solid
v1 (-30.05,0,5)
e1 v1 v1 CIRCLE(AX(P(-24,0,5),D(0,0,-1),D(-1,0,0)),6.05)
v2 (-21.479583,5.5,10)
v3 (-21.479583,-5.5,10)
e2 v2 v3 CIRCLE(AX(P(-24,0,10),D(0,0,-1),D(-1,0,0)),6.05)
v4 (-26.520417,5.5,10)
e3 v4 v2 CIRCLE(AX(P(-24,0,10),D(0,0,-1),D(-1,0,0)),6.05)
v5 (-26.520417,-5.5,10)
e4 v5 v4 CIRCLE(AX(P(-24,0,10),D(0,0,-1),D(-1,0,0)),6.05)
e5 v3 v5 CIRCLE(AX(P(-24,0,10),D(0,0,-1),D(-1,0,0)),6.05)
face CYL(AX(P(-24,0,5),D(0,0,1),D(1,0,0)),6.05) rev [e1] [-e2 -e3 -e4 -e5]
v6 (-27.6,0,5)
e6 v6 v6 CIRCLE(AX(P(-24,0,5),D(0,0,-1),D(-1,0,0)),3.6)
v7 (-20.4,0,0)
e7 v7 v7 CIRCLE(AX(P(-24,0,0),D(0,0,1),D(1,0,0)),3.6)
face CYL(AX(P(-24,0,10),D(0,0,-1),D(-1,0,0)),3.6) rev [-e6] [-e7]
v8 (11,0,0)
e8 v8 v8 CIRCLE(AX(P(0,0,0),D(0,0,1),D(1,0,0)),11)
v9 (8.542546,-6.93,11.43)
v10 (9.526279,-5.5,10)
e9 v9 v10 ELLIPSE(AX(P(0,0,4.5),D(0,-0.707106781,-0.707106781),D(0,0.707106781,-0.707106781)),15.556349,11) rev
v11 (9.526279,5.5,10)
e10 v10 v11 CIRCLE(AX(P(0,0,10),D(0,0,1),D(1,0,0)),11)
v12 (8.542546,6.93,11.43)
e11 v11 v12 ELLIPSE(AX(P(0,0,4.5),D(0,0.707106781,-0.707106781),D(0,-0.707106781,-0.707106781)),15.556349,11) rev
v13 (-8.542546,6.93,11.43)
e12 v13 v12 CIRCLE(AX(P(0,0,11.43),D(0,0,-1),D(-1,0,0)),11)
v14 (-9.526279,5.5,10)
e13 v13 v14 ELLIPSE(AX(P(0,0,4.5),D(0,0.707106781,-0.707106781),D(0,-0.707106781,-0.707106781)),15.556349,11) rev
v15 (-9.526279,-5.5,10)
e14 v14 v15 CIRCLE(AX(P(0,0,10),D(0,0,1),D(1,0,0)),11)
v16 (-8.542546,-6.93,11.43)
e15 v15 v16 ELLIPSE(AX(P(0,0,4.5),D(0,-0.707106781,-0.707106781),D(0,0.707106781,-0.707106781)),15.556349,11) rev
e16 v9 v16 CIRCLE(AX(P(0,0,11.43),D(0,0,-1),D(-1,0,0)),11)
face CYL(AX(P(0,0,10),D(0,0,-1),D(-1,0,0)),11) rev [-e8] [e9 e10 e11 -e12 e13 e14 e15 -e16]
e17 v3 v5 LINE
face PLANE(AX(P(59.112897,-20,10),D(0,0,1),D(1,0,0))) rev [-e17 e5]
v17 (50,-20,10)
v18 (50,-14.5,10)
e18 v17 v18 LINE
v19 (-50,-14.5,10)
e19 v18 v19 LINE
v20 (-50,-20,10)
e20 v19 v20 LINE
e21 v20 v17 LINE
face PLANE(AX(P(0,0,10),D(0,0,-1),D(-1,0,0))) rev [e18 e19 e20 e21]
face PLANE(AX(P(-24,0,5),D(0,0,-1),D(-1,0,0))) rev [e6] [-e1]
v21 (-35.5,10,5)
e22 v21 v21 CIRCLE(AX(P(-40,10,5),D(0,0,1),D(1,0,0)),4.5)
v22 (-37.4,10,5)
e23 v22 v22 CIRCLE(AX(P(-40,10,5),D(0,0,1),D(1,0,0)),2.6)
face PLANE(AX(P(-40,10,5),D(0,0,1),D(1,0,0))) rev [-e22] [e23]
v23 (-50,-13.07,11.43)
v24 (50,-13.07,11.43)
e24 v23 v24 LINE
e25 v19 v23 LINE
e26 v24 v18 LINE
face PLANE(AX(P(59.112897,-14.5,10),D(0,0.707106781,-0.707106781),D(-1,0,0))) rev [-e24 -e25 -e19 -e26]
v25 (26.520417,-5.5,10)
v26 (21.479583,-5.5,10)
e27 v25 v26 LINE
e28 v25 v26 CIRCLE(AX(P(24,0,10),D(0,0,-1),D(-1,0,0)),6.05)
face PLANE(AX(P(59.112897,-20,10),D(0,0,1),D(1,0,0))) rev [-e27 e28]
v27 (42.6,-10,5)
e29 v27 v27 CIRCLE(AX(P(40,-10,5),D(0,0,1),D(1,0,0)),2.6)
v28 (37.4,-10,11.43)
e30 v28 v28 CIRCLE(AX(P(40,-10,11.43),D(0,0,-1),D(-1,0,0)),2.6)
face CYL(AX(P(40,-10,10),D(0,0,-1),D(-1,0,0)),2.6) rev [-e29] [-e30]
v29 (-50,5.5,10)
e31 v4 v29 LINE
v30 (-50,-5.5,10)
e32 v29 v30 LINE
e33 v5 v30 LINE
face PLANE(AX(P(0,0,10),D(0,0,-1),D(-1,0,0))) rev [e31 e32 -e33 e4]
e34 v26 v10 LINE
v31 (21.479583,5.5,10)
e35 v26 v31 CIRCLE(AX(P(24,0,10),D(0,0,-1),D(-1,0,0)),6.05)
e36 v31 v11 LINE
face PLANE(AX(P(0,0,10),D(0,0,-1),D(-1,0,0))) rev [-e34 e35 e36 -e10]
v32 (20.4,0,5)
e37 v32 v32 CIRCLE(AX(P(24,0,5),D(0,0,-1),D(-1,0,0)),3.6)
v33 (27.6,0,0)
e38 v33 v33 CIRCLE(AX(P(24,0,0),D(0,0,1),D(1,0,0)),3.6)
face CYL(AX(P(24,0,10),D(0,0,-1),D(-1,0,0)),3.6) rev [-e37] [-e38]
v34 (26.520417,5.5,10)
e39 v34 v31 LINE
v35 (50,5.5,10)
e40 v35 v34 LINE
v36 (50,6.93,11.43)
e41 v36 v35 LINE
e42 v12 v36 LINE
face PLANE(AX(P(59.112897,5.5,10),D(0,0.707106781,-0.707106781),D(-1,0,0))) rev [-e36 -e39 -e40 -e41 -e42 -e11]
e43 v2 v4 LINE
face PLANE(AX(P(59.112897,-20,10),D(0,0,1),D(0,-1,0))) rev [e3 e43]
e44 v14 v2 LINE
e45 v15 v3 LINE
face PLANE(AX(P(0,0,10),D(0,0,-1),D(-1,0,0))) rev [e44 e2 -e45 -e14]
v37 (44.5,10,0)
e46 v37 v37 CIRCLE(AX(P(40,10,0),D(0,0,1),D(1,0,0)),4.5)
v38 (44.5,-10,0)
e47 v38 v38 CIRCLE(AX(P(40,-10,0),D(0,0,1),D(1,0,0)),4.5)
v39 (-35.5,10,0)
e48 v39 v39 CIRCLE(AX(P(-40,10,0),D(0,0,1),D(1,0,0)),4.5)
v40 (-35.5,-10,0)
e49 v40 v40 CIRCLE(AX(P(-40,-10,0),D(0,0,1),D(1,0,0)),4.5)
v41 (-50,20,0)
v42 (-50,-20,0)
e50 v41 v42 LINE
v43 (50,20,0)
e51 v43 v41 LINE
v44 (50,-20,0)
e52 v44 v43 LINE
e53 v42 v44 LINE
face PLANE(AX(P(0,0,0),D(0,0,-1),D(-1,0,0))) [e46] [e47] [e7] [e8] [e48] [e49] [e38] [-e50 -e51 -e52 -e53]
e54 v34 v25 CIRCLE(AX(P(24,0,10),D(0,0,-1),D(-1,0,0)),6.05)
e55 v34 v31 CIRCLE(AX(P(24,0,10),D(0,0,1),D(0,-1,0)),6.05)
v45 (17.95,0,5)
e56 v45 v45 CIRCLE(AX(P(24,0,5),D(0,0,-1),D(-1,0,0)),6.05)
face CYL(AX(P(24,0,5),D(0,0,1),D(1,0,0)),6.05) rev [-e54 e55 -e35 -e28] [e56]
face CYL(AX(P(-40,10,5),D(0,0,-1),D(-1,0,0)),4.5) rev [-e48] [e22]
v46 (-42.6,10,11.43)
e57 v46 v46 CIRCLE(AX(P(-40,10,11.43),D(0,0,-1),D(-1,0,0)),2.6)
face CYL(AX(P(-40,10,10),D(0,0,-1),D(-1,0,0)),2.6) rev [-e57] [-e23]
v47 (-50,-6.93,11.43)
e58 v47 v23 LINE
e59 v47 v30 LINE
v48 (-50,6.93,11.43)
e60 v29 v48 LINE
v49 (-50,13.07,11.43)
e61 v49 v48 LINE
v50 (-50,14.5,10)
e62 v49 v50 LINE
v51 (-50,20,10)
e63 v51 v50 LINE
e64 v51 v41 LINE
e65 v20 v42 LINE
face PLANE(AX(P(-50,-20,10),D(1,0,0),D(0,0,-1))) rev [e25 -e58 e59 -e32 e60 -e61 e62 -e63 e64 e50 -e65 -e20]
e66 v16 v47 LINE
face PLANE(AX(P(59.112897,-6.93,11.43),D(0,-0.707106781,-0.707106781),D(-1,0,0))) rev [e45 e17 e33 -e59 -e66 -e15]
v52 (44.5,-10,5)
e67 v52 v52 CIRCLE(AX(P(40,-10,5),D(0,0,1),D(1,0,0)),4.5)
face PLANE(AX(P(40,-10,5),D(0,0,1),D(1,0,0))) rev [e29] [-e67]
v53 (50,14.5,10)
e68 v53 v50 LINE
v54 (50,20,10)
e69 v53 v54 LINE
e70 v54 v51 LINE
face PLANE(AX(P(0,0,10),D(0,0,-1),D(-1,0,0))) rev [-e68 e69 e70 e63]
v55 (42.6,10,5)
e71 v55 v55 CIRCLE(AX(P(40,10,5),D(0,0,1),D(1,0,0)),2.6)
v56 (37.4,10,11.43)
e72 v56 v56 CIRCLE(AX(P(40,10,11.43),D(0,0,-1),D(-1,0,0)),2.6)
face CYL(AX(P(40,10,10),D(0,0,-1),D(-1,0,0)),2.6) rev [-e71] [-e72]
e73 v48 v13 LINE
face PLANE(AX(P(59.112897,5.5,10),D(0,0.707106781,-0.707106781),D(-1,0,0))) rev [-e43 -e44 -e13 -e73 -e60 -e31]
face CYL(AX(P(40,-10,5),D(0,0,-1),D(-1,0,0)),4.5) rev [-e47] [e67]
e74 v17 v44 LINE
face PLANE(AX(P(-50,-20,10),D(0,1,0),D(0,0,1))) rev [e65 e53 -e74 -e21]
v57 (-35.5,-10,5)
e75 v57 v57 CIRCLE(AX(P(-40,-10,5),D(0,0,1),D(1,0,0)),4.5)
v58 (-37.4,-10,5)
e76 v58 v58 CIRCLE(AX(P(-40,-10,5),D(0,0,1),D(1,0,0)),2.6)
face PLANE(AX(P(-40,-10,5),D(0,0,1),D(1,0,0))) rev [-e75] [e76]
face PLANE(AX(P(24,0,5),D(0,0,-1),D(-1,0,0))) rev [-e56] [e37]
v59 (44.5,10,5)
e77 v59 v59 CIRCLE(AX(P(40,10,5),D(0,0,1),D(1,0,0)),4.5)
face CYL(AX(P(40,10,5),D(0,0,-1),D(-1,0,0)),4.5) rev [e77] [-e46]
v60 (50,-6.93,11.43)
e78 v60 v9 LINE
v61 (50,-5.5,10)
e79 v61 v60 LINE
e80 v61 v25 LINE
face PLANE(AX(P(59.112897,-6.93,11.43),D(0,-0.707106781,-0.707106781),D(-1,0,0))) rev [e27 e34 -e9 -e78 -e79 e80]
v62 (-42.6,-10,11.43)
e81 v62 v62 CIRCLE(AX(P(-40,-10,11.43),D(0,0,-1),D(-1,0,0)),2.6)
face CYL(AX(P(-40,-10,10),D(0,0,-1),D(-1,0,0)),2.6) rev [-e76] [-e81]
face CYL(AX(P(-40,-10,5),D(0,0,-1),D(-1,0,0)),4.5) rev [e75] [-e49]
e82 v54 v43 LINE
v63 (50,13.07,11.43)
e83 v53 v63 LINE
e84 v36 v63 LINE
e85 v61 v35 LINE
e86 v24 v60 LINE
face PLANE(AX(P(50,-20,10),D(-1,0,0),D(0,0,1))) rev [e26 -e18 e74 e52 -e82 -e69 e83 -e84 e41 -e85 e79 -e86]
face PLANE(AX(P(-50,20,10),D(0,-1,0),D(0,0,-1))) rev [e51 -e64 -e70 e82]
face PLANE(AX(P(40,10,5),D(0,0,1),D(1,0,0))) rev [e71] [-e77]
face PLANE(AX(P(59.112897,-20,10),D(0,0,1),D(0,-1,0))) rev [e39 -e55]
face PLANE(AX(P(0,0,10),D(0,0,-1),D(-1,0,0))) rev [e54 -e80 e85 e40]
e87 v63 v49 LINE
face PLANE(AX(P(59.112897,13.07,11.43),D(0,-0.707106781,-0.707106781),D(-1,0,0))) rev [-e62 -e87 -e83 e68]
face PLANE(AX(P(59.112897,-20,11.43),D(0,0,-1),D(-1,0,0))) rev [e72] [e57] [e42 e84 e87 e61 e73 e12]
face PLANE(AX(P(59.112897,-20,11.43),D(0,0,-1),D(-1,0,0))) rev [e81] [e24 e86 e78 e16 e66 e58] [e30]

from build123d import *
from build123d.topology import SkipClean

# Parameters (mm, degrees)
SKETCH1_W               = 100
SKETCH1_H               = 40
SKETCH1_R               = 11
SKETCH1_R_2             = 2.6
SKETCH1_R_3             = 3.6
BOSS_EXTRUDE1_DEPTH     = 10
CUT_EXTRUDE1_START      = 10
SKETCH2_R               = 6.05
CUT_EXTRUDE1_DEPTH      = 5
SKETCH3_R               = 4.5
CUT_EXTRUDE2_DEPTH      = 5
BOSS_EXTRUDE3_START     = -50
SKETCH4_W               = 1.43
SKETCH4_H               = 9
BOSS_EXTRUDE3_DEPTH     = 100
CHAMFER1_SIZE           = 1.43
CUT_EXTRUDE4_DEPTH      = 56.051293354
CUT_EXTRUDE4_DEPTH_BACK = 56.051293354
SKETCH5_R               = 11
SKETCH5_R_2             = 2.6


with BuildPart() as part:
    # Sketch1 → Boss-Extrude1 (new body)
    with BuildSketch(Plane.XY):
        Rectangle(SKETCH1_W, SKETCH1_H)
        Circle(SKETCH1_R, mode=Mode.SUBTRACT)
        with Locations((-40, 10)):
            Circle(SKETCH1_R_2, mode=Mode.SUBTRACT)
        with Locations((-40, -10)):
            Circle(SKETCH1_R_2, mode=Mode.SUBTRACT)
        with Locations((40, 10)):
            Circle(SKETCH1_R_2, mode=Mode.SUBTRACT)
        with Locations((40, -10)):
            Circle(SKETCH1_R_2, mode=Mode.SUBTRACT)
        with Locations((-24, 0)):
            Circle(SKETCH1_R_3, mode=Mode.SUBTRACT)
        with Locations((24, 0)):
            Circle(SKETCH1_R_3, mode=Mode.SUBTRACT)
    extrude(amount=BOSS_EXTRUDE1_DEPTH)

    # Sketch2 → Cut-Extrude1 (cut)
    with BuildSketch(Plane.XY.offset(CUT_EXTRUDE1_START)):
        with Locations(Location((24, 0, 0), (0, 0, 180))):
            Circle(SKETCH2_R)
        with Locations(Location((-24, 0, 0), (0, 0, 180))):
            Circle(SKETCH2_R)
    extrude(amount=-CUT_EXTRUDE1_DEPTH, mode=Mode.SUBTRACT)

    # Sketch3 → Cut-Extrude2 (cut)
    with BuildSketch(Plane.XY):
        with Locations((40, 10)):
            Circle(SKETCH3_R)
        with Locations((40, -10)):
            Circle(SKETCH3_R)
        with Locations((-40, 10)):
            Circle(SKETCH3_R)
        with Locations((-40, -10)):
            Circle(SKETCH3_R)
    extrude(amount=CUT_EXTRUDE2_DEPTH, mode=Mode.SUBTRACT)

    # Sketch4 → Boss-Extrude3 (add)
    with BuildSketch(Plane(origin=(0, 0, 0), x_dir=(0, 0, -1), z_dir=(1, 0, 0)).offset(BOSS_EXTRUDE3_START)):
        with Locations((-10.715, 10)):
            Rectangle(SKETCH4_W, SKETCH4_H)
        with Locations((-10.715, -10)):
            Rectangle(SKETCH4_W, SKETCH4_H)
    extrude(amount=BOSS_EXTRUDE3_DEPTH)

    # Chamfer1
    chamfer1_edges = [part.edges().sort_by_distance(p)[0] for p in [
        (0, -14.5, 11.43),
        (0, -5.5, 11.43),
        (0, 5.5, 11.43),
        (0, 14.5, 11.43),
    ]]
    chamfer(chamfer1_edges, length=CHAMFER1_SIZE - 0.0001)  # a hair under: the kernel refuses the full size

    # Sketch5 → Cut-Extrude4 (cut, two sides: drawn at the far end of the back side and taken through both)
    with SkipClean():  # the faces are left unmerged after this step: merging them gives an invalid solid
        with BuildSketch(Plane.XY.offset(-CUT_EXTRUDE4_DEPTH_BACK)):
            with Locations(Location((0, 0, 0), (0, 0, 150))):
                Circle(SKETCH5_R)
            with Locations(Location((-40, 10, 0), (0, 0, 180))):
                Circle(SKETCH5_R_2)
            with Locations(Location((-40, -10, 0), (0, 0, 180))):
                Circle(SKETCH5_R_2)
            with Locations(Location((40, -10, 0), (0, 0, 180))):
                Circle(SKETCH5_R_2)
            with Locations(Location((40, 10, 0), (0, 0, 180))):
                Circle(SKETCH5_R_2)
        extrude(amount=CUT_EXTRUDE4_DEPTH + CUT_EXTRUDE4_DEPTH_BACK, mode=Mode.SUBTRACT)


solid = part.part
